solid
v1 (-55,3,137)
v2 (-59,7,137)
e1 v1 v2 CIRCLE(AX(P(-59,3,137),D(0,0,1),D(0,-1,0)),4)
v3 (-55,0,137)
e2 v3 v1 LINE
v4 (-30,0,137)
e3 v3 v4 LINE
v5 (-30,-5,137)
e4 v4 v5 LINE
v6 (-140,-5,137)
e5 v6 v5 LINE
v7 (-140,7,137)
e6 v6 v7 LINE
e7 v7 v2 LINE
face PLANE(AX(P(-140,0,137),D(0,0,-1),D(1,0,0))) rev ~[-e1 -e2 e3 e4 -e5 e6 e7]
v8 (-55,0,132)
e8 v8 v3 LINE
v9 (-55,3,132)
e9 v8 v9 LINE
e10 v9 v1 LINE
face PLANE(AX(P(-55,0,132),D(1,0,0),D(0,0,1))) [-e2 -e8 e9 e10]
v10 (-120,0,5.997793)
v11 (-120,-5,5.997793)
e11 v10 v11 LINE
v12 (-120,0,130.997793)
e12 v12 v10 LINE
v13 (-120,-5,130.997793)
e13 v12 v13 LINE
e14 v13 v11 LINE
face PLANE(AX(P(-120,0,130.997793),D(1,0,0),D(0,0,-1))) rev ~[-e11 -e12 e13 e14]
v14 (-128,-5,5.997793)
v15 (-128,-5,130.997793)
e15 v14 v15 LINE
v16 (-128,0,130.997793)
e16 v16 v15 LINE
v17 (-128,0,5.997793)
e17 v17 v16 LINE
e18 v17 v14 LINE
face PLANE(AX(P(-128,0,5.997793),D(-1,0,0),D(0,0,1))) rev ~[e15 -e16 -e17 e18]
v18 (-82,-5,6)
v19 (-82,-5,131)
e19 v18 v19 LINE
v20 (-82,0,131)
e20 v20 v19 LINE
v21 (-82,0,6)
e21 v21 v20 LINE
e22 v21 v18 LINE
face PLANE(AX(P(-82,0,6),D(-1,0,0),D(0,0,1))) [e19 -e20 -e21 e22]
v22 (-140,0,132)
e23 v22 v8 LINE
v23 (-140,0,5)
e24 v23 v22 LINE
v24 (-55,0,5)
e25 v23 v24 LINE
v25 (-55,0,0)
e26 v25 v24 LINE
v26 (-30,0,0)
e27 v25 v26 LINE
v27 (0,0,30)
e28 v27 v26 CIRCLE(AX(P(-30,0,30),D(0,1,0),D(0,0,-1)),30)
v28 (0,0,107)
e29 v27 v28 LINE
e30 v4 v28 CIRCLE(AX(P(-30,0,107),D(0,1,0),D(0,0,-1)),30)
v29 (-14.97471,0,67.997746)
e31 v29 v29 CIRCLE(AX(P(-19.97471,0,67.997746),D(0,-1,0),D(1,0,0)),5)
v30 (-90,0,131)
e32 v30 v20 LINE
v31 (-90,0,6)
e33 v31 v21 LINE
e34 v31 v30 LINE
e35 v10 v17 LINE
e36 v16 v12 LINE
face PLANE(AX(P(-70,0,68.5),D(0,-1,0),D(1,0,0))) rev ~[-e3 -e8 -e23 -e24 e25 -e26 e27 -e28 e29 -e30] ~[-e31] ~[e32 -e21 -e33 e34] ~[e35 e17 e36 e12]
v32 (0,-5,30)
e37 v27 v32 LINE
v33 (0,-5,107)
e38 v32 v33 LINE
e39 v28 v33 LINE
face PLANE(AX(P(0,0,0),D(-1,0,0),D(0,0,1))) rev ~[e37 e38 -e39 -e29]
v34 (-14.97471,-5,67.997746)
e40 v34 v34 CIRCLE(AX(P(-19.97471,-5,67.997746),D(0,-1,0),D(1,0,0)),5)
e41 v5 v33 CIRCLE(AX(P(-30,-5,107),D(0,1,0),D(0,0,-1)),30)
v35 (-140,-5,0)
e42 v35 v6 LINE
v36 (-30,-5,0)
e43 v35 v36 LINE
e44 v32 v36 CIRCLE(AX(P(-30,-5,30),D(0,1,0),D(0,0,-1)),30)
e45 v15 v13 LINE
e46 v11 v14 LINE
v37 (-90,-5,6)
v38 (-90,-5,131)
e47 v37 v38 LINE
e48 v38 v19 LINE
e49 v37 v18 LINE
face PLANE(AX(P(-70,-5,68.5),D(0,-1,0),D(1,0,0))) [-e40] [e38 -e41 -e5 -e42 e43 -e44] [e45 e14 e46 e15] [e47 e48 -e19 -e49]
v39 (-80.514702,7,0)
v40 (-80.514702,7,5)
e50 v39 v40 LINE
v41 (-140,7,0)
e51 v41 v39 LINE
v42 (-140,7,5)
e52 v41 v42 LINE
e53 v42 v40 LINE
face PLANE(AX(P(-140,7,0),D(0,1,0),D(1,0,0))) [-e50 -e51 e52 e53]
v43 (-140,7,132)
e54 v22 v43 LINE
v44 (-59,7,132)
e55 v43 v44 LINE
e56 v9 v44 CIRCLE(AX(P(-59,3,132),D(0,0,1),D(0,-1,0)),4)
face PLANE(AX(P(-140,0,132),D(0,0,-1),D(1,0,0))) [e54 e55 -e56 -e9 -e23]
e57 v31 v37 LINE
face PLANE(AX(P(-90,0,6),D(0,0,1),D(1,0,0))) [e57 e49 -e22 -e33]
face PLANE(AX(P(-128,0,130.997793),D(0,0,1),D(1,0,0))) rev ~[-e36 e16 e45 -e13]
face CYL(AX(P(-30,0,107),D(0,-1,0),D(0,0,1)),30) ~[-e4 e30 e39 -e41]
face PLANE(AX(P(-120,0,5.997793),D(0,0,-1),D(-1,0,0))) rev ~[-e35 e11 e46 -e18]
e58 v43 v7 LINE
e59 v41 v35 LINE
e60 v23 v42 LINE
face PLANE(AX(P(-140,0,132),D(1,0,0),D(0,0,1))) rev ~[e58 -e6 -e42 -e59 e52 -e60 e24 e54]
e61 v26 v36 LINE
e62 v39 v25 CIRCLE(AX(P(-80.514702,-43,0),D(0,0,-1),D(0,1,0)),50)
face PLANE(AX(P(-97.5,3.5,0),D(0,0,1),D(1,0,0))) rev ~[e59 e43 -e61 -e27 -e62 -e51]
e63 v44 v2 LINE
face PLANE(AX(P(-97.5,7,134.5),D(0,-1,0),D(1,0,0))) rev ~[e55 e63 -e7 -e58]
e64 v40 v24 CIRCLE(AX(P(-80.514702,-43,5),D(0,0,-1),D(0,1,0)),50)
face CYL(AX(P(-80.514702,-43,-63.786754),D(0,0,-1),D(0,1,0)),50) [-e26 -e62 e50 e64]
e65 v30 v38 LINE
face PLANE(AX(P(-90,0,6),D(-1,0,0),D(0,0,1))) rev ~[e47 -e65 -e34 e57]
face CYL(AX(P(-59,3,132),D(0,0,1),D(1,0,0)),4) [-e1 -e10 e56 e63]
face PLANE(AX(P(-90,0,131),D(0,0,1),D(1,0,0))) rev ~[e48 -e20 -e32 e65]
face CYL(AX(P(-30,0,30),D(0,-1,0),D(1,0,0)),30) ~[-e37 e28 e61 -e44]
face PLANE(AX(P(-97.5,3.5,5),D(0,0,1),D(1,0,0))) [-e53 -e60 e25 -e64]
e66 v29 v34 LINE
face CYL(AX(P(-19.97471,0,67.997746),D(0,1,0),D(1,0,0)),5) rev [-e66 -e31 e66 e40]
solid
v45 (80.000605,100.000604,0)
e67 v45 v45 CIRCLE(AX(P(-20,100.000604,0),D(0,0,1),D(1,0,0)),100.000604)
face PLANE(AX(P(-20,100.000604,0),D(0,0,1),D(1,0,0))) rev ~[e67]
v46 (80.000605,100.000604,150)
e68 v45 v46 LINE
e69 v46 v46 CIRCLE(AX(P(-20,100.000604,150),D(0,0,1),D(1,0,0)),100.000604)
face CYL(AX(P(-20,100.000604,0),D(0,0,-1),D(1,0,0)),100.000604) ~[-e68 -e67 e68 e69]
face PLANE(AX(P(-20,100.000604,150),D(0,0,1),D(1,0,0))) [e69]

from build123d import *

# Parameters (mm, degrees)
F0_W        = 140
F0_H        = 137
F0_R        = 5
F0_W_2      = 8
F0_H_2      = 125
F1_DEPTH    = 5
F2_R        = 30
F3_R        = 30
F4_W        = 85
F4_H        = 7
F5_DEPTH    = 5
F6_T1_DEPTH = 132.5735082217
F7_W        = 85
F7_H        = 5
F8_DEPTH    = 7
F9_R        = 4
F10_R       = 100.0006041304
F11_DEPTH   = 150


# Not quite as in the source:
# - a fillet or chamfer that OpenCascade refuses, or shapes differently, is made with other operations: its cross-section is extruded or revolved along the edge and cut away or added


with BuildPart() as f1:
    # F0 (on Front) → F1 (new body)
    with BuildSketch(Plane.XZ):
        with Locations((-70, 68.5)):
            Rectangle(F0_W, F0_H)
        Polygon((-128, 5.9977934385), (-128, 130.9977934385), (-120, 130.9977934385), (-120, 6), (-120, 5.9977934385), align=None, mode=Mode.SUBTRACT)
        with Locations((-19.9747101513, 67.9977461696)):
            Circle(F0_R, mode=Mode.SUBTRACT)
        with Locations((-86, 68.5)):
            Rectangle(F0_W_2, F0_H_2, mode=Mode.SUBTRACT)
    extrude(amount=F1_DEPTH)

    # F2
    f2_edges = [f1.edges().sort_by_distance(p)[0] for p in [
        (0, -2.5, 137),
    ]]
    fillet(f2_edges, radius=F2_R)

    # F3
    f3_edges = [f1.edges().sort_by_distance(p)[0] for p in [
        (0, -2.5, 0),
    ]]
    fillet(f3_edges, radius=F3_R)

    # F4 (on Top) → F5 (join)
    with BuildSketch(Plane.XY):
        with Locations((-97.5, 3.5)):
            Rectangle(F4_W, F4_H)
    extrude(amount=F5_DEPTH)

    # F6: fillet of radius 50 on 1 edges, made by hand

    # F6_s2 → F6_t1 (cut)
    with BuildSketch(Plane.XY.offset(-63.7867541109)):
        with BuildLine():
            ThreePointArc((-80.5147016443, 7), (-67.285945089, 5.218253805), (-55, 0))
            Line((-55, 0), (-55, 7))
            Line((-55, 7), (-80.5147016443, 7))
        make_face()
    extrude(amount=F6_T1_DEPTH, mode=Mode.SUBTRACT)

    # F7 (on Front) → F8 (join)
    with BuildSketch(Plane.XZ):
        with Locations((-97.5, 134.5)):
            Rectangle(F7_W, F7_H)
    extrude(amount=-F8_DEPTH)

    # F9
    f9_edges = [f1.edges().sort_by_distance(p)[0] for p in [
        (-55, 7, 134.5),
    ]]
    fillet(f9_edges, radius=F9_R)


with BuildPart() as f11:
    # F10 (on Top) → F11 (new body)
    with BuildSketch(Plane.XY):
        with Locations((-19.999999553, 100.0006041304)):
            Circle(F10_R)
    extrude(amount=F11_DEPTH)


solid = Compound([f1.part, f11.part])
